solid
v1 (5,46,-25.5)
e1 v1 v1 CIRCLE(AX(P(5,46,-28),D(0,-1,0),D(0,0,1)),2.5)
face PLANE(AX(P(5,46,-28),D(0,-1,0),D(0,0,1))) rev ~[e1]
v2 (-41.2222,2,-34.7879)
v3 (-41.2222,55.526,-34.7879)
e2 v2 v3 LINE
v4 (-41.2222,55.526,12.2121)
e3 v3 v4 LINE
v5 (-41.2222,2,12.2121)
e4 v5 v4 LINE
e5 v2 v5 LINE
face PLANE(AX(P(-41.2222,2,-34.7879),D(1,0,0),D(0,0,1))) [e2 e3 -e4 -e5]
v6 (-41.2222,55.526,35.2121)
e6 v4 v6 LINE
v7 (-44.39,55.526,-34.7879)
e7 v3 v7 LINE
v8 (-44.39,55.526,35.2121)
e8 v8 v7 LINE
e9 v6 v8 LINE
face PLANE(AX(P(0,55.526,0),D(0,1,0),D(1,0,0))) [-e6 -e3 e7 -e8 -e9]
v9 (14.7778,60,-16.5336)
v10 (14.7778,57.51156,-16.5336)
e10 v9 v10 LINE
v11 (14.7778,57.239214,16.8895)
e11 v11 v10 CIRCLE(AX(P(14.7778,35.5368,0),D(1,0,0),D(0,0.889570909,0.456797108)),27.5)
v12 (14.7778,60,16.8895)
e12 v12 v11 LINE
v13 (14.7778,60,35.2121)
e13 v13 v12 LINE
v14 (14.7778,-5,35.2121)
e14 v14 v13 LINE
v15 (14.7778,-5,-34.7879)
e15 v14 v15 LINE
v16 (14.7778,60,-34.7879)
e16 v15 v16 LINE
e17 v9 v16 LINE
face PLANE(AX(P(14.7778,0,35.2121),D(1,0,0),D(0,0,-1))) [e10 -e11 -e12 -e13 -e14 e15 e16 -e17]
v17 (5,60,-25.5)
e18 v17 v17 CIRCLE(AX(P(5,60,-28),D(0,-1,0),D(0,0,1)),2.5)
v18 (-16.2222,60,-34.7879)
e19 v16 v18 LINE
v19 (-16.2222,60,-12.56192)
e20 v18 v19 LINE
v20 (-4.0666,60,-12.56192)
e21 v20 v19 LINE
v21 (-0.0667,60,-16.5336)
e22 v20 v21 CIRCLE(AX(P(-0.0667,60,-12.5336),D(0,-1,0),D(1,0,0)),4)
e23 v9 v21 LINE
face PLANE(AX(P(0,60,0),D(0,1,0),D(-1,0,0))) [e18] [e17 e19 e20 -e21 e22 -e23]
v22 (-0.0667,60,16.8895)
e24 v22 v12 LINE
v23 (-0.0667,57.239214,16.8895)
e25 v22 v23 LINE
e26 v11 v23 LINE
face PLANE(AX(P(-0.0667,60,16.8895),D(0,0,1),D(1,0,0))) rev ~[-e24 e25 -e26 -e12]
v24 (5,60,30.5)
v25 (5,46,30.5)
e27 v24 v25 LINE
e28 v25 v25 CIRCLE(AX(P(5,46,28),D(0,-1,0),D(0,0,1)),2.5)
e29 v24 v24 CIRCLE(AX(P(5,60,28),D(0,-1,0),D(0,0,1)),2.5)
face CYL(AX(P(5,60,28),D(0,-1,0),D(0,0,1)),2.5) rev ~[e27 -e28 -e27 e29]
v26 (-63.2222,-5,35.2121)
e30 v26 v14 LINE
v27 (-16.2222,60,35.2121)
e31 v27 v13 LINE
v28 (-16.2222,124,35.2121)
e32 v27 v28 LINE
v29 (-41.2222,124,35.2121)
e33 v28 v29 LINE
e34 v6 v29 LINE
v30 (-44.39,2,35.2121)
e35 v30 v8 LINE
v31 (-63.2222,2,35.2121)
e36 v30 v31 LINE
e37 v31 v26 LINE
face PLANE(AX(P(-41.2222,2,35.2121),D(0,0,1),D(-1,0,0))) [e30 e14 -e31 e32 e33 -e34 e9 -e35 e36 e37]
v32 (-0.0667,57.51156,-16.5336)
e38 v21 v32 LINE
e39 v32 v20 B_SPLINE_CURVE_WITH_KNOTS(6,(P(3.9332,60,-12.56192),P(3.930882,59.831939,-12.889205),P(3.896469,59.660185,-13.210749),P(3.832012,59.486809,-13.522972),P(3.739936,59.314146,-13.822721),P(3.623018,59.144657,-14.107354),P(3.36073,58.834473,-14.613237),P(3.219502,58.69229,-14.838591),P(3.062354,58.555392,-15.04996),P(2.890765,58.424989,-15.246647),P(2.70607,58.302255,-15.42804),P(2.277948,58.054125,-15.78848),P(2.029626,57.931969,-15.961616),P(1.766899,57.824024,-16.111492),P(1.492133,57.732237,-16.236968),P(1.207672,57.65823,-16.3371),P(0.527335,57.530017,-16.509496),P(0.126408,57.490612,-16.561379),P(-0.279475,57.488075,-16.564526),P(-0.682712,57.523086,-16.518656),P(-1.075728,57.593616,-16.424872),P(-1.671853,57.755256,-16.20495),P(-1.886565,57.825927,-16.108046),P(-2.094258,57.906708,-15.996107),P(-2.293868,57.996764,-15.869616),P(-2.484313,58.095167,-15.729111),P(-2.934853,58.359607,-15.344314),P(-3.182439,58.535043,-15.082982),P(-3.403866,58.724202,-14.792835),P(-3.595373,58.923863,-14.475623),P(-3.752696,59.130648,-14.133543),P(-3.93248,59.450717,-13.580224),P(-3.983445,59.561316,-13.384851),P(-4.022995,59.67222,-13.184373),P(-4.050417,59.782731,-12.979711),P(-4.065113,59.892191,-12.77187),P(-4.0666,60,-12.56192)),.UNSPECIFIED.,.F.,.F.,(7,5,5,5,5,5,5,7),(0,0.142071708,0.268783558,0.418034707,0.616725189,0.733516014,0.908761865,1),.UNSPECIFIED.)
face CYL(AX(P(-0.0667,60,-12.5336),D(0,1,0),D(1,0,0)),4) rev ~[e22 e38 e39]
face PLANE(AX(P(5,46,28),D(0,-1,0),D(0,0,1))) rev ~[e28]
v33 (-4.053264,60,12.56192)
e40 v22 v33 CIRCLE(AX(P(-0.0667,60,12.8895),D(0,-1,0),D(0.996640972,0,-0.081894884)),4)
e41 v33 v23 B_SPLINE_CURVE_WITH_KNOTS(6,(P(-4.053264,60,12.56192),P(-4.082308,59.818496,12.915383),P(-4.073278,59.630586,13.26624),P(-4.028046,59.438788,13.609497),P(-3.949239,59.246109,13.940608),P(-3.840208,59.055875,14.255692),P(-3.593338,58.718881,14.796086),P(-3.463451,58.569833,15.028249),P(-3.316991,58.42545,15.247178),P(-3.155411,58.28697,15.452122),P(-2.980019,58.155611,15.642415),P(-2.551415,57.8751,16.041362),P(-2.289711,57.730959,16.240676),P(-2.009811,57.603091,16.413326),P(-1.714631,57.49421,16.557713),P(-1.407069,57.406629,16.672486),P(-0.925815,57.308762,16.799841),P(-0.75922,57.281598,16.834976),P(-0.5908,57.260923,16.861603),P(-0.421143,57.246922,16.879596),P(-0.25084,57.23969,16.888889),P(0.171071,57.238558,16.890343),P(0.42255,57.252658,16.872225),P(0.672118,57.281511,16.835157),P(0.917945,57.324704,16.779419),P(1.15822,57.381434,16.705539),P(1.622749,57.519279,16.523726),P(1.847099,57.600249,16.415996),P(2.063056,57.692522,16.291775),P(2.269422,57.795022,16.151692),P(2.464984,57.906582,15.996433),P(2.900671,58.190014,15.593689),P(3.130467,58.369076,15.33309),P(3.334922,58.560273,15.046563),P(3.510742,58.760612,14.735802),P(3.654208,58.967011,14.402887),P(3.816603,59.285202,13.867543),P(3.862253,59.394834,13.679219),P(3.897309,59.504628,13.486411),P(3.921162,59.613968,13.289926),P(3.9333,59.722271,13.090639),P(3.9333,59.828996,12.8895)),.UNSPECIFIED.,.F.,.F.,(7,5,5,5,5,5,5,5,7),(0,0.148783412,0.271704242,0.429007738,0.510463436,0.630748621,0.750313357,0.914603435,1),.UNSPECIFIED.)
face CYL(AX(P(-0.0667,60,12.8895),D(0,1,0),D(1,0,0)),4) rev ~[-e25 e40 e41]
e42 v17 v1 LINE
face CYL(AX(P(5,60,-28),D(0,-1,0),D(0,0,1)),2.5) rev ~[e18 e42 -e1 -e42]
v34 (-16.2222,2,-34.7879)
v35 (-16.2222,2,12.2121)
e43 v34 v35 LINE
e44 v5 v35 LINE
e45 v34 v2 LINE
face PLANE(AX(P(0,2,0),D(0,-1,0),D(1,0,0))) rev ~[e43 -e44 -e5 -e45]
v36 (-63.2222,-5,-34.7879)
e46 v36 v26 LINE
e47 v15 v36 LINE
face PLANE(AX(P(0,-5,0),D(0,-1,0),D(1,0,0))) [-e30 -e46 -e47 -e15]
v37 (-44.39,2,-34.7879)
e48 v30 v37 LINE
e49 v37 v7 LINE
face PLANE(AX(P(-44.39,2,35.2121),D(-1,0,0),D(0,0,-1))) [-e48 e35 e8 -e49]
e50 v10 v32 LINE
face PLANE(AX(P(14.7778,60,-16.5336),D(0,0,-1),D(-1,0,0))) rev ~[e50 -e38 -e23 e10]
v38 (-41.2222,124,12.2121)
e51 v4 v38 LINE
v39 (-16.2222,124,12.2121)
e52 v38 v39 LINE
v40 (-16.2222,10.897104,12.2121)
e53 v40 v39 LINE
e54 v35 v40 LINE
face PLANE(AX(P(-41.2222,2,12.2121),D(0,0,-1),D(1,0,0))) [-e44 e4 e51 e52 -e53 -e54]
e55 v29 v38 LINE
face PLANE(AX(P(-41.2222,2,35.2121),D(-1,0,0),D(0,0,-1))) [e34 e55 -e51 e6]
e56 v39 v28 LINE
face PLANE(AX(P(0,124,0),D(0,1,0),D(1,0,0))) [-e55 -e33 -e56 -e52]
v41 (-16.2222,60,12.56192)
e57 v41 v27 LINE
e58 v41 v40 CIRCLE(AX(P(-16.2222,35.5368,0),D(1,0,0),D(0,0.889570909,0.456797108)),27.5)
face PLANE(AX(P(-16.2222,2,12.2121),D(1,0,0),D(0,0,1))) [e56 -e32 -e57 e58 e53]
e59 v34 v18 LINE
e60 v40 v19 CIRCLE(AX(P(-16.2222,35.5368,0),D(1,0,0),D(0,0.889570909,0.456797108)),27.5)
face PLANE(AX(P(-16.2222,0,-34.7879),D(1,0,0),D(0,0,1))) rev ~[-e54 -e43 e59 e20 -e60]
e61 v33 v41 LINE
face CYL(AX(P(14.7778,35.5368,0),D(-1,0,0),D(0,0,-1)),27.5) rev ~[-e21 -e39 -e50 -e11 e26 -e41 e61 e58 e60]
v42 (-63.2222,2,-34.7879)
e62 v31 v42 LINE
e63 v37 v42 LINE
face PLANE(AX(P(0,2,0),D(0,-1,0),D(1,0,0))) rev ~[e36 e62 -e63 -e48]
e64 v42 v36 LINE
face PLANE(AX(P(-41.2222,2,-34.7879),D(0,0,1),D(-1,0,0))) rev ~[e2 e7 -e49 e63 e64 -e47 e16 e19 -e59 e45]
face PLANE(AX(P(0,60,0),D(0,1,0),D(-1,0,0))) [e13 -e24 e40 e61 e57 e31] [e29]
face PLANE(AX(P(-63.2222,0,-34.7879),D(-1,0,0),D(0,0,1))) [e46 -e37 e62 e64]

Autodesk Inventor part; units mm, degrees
ref_plane "YZ Plane" through (0, 0, 0) normal (1, 0, 0) x (0, 1, 0)
ref_plane "XZ Plane" through (0, 0, 0) normal (0, 1, 0) x (-1, 0, 0)
ref_plane "XY Plane" through (0, 0, 0) normal (0, 0, 1) x (1, 0, 0)
sketch "Sketch1" plane through (0, 0, 0) normal (0, 1, 0) x (-1, 0, 0)
  line L0 (16.2222, 35.2121) -> (-14.7778, 35.2121)
  line L1 (-14.7778, 35.2121) -> (-14.7778, -34.7879)
  line L2 (-14.7778, -34.7879) -> (16.2222, -34.7879)
  line L3 (16.2222, -34.7879) -> (16.2222, 35.2121)
  point P0 (0, 0)
  dimension "d0" = 70
  dimension "d1" = 31
extrude "Extrusion1" add sketch "Sketch1" along normal blind 60
sketch "Sketch3" plane through (14.7778, 0, 35.2121) normal (1, 0, 0) x (0, 0, -1)
  circle A0 centre (35.2121, 35.5368) radius 27.5
  point P0 (35.2121, 0)
  dimension "d5" = 55
hole "Hole1" at (14.7778, 35.5368, 0) direction (-1, 0, 0) diameter 55 end through all
sketch "Sketch6" plane through (0, 60, 0) normal (0, 1, 0) x (1, 0, 0)
  line L0 (-0.0667, -13.4045) -> (-0.0667, 12.7365)
  line L1 (-16.2222, 0) -> (14.7778, 0) construction
  circle A0 centre (-0.0667, -12.8895) radius 4
  circle A1 centre (-0.0667, 12.5336) radius 4
  point P0 (0, 0)
  point P1 (14.7778, -12.562)
  point P2 (-16.2222, -12.562)
  point P3 (-16.2222, 12.562)
  point P4 (14.7778, 12.562)
  dimension "d42" = 8
  dimension "d43" = 8
sketch "Sketch8" plane through (0, 60, 0) normal (0, 1, 0) x (1, 0, 0)
  line L0 (14.7778, 34.7879) -> (-16.2222, 34.7879) construction
  line L1 (-16.2222, 0) -> (14.7778, 0) construction
  circle A0 centre (5, -28) radius 2
  circle A1 centre (5, 28) radius 2
  point P0 (0, 0)
  dimension "d33" = 4
extrude "Extrusion4" cut sketch "Sketch6" against normal blind 4
sketch "Sketch15" plane through (0, 60, 0) normal (0, 1, 0) x (1, 0, 0)
  arc A0 (-4.0532, -12.562) -> (3.9199, -12.562) centre (-0.0667, -12.8895) ccw projected
  line L0 (-0.0667, -16.8895) -> (14.7778, -16.8895)
  line L1 (14.7778, 27.5) -> (14.7778, -27.5) projected
  line L2 (14.7778, -12.562) -> (14.7778, -16.8895)
  line L3 (14.7778, -12.562) -> (3.9199, -12.562) projected
  line L4 (-0.0667, -12.8895) -> (-0.0667, -12.8895)
  arc A1 (3.9332, 12.562) -> (-4.0666, 12.562) centre (-0.0667, 12.5336) ccw projected
  line L5 (-0.0667, 16.5336) -> (-0.0667, 12.5336)
  line L6 (3.9332, 12.562) -> (14.7778, 12.562) projected
  line L7 (14.7778, 12.562) -> (14.7778, 16.5336)
  line L8 (14.7778, 16.5336) -> (-0.0667, 16.5336)
  line L9 (-0.0667, -12.562) -> (14.7778, -12.562)
  line L10 (-0.0667, -12.562) -> (-0.0667, -16.8895)
  line L11 (14.7778, 12.562) -> (-0.0667, 12.5336)
  point P0 (0, 0)
extrude "Extrusion5" cut sketch "Sketch15" against normal blind 4 contours A0 L3 L1 L0 | L1 L6 A1 L8
hole "Hole5" at (5, 60, 28) at (5, 60, -28) direction (0, -1, 0) diameter 5 depth 14
sketch "Sketch18" plane through (0, 0, 0) normal (0, -1, 0) x (1, 0, 0)
  line L0 (-16.2222, -34.7879) -> (-63.2222, -34.7879)
  line L1 (-16.2222, 35.2121) -> (-63.2222, 35.2121)
  line L2 (-63.2222, 35.2121) -> (-63.2222, -34.7879)
  line L3 (-16.2222, -34.7879) -> (-16.2222, 35.2121)
  line L4 (-63.2222, -34.7879) -> (-63.2222, 35.2121)
  point P0 (0, 0)
  dimension "d57" = 47
extrude "Extrusion9" add sketch "Sketch18" against normal blind 2
sketch "Sketch25" plane through (0, 0, 0) normal (0, -1, 0) x (1, 0, 0)
  line L0 (-63.2222, 35.2121) -> (14.7778, 35.2121)
  line L1 (14.7778, 35.2121) -> (14.7778, -34.7879)
  line L2 (14.7778, -34.7879) -> (-63.2222, -34.7879)
  line L3 (-63.2222, -34.7879) -> (-63.2222, 35.2121)
  point P0 (0, 0)
extrude "Extrusion11" add sketch "Sketch25" along normal blind 5
sketch "Sketch29" plane through (0, 2, 0) normal (0, 1, 0) x (1, 0, 0)
  point P0 (0, 0)
sketch "Sketch37" plane through (0, 2, 0) normal (0, 1, 0) x (1, 0, 0)
  point P0 (0, 0)
sketch "Sketch39" plane through (0, 2, 0) normal (0, 1, 0) x (1, 0, 0)
  line L0 (-16.2222, -35.2121) -> (-41.2222, -35.2121)
  line L1 (-41.2222, -35.2121) -> (-41.2222, -12.2121)
  line L2 (-41.2222, -12.2121) -> (-16.2222, -12.2121)
  line L3 (-16.2222, -12.2121) -> (-16.2222, -35.2121)
  point P0 (0, 0)
  dimension "d120" = 25
  dimension "d121" = 23
extrude "Extrusion27" add sketch "Sketch39" along normal blind 122
sketch "Sketch43" plane through (0, 2, 0) normal (0, 1, 0) x (1, 0, 0)
  line L0 (-16.2222, 34.7879) -> (-63.2222, 34.7879) projected
  line L1 (-41.2222, -35.2121) -> (-44.39, -35.2121)
  line L2 (-44.39, -35.2121) -> (-44.39, 34.7879)
  line L3 (-44.39, 34.7879) -> (-41.2222, 34.7879)
  line L4 (-41.2222, 34.7879) -> (-41.2222, -35.2121)
  point P0 (0, 0)
extrude "Extrusion28" add sketch "Sketch43" along normal blind 53.526
properties part number "BF_base_model"
